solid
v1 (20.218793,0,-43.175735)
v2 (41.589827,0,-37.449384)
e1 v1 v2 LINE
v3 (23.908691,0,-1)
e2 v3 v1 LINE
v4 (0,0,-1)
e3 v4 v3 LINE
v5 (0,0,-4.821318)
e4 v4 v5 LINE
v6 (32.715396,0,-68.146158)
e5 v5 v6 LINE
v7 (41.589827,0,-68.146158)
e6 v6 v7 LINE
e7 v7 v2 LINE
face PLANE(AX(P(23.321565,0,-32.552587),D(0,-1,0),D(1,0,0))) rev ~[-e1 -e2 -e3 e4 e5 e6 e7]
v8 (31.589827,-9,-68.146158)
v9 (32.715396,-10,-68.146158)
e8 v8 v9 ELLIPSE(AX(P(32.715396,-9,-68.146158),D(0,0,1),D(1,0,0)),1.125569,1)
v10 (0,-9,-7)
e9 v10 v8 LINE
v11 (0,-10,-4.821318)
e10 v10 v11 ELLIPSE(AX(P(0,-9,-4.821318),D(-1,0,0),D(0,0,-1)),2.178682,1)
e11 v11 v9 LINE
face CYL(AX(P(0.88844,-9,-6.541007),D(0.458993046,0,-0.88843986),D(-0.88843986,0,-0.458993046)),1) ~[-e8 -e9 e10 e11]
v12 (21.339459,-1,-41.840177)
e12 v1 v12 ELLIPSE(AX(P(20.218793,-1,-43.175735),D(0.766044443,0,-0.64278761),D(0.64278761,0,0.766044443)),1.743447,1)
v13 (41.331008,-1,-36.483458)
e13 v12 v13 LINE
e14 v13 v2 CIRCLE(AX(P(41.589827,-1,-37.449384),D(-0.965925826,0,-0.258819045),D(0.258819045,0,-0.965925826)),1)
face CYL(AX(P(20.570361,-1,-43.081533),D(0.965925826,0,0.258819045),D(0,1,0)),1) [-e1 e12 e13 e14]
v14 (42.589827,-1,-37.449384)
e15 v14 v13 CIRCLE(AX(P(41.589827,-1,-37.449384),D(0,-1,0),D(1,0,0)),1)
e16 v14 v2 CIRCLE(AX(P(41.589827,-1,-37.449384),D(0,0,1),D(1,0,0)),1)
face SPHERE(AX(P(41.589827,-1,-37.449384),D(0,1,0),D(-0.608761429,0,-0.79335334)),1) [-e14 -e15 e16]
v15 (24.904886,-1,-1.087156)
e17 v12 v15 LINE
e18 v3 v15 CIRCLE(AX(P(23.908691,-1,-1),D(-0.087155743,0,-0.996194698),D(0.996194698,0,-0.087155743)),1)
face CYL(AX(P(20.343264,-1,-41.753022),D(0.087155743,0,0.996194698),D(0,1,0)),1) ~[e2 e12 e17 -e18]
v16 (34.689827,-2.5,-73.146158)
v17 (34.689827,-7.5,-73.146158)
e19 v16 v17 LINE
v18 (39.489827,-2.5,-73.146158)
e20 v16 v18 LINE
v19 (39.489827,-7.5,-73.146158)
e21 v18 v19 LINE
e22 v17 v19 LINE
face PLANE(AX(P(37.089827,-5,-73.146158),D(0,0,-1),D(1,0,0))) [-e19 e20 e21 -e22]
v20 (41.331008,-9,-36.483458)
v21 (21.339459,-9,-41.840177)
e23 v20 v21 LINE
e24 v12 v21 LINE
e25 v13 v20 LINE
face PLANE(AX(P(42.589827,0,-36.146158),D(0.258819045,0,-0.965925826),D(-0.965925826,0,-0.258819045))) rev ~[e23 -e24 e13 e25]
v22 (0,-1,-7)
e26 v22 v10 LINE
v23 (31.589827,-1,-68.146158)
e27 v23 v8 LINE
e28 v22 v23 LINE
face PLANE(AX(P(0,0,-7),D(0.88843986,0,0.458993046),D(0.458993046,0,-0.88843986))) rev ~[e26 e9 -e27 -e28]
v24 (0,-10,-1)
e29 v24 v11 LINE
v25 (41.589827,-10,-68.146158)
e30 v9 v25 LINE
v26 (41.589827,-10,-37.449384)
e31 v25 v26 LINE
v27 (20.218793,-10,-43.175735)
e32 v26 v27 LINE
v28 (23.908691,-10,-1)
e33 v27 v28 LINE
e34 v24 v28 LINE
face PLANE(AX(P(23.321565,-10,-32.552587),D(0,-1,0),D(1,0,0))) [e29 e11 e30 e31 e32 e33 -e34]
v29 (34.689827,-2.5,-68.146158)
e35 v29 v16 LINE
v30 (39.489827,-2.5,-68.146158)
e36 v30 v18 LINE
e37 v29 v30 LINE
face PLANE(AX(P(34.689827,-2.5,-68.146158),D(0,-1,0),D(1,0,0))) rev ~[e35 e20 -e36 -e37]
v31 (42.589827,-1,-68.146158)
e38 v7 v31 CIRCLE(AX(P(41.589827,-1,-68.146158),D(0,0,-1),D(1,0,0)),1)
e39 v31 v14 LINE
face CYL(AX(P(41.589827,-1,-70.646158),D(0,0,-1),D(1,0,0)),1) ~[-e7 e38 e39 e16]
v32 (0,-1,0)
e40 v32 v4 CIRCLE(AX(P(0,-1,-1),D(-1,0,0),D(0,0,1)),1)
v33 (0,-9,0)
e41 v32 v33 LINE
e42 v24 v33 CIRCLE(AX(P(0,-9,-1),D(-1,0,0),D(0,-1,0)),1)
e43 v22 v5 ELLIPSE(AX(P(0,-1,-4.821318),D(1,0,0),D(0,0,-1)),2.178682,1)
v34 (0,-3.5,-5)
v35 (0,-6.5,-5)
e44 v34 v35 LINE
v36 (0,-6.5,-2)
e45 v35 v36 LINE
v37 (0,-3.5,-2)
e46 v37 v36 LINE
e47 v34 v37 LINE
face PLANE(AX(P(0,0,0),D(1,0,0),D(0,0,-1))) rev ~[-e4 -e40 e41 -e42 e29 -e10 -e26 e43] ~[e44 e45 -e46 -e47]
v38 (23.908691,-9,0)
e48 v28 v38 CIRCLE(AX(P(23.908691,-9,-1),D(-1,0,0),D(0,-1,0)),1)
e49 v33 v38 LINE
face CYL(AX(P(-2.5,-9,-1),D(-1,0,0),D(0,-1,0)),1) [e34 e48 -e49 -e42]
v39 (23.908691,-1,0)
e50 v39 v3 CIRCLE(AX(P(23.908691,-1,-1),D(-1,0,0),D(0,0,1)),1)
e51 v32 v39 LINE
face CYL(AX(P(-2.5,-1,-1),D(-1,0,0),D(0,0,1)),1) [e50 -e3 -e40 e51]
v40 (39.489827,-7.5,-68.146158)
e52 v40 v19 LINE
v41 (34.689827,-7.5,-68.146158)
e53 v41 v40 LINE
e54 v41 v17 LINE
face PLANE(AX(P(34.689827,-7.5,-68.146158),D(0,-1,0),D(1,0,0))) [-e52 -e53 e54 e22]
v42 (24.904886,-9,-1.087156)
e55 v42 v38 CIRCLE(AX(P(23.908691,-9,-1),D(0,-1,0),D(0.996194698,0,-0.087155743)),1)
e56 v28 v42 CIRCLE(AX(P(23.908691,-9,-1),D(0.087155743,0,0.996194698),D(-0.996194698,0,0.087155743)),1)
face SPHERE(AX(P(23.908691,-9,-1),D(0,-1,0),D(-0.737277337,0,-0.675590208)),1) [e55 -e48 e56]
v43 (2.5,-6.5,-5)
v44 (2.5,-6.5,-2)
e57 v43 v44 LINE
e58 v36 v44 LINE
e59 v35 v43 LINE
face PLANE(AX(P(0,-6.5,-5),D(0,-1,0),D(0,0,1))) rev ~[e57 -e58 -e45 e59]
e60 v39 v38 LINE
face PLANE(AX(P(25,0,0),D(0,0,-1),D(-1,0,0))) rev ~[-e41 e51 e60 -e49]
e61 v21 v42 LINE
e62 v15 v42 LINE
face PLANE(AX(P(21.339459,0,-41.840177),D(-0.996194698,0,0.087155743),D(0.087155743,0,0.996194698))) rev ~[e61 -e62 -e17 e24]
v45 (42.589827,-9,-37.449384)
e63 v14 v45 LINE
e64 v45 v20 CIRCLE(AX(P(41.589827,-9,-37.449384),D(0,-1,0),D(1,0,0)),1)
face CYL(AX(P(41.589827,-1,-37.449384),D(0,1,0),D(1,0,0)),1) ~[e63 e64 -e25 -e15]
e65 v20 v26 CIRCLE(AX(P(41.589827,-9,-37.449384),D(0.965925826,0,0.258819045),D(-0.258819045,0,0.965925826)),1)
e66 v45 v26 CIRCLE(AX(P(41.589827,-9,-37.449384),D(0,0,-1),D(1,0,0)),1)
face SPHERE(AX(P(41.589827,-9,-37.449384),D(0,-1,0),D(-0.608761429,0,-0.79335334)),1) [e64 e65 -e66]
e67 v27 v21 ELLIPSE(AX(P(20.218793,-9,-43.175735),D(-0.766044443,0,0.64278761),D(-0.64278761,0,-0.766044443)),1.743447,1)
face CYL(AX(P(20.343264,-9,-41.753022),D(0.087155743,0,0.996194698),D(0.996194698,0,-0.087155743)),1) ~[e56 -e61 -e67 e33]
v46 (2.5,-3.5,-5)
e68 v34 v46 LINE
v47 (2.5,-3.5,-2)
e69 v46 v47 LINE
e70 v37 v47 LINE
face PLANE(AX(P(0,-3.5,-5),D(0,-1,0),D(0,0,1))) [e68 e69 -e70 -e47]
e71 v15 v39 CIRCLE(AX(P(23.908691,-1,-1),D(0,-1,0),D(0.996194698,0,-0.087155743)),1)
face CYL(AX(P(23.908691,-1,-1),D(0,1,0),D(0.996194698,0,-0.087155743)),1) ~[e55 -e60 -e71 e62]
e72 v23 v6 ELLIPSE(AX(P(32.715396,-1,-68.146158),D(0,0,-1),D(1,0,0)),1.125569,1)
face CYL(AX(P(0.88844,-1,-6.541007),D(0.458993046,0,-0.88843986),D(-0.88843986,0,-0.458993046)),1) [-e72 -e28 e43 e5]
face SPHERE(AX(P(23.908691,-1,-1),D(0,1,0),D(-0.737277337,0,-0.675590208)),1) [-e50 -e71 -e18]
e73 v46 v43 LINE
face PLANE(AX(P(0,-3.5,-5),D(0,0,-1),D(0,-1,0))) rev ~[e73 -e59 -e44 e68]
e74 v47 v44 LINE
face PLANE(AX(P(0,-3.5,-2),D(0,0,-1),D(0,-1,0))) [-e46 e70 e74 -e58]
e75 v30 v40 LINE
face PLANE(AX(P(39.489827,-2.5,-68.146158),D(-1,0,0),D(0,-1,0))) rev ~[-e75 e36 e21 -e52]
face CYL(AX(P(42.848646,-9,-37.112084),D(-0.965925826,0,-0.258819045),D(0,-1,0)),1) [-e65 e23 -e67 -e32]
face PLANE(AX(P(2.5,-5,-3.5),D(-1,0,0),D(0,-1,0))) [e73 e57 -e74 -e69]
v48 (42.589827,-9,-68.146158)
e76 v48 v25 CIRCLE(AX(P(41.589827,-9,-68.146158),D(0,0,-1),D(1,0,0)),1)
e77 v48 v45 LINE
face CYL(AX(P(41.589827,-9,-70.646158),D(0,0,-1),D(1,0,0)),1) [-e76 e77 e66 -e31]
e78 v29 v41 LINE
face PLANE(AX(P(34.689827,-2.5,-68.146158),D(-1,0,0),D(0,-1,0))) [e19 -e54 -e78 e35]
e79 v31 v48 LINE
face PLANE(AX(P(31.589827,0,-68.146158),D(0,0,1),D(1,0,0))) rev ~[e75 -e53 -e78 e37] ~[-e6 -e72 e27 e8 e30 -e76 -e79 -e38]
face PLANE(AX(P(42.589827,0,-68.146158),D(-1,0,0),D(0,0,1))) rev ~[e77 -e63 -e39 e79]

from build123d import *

# Parameters (mm, degrees)
F1_DEPTH      = 10
F3_W          = 4.8
F3_H          = 5
F4_DEPTH      = 5
F5_W          = 3
F5_H          = 3
F6_DEPTH      = 2.5
F7_R          = 1
F8_R          = 1
F9_R          = 1
F10_R         = 1
F11_R         = 1
F12_T1_DEPTH  = 33.1967746272
F12_T3_DEPTH  = 8
F12_T8_DEPTH  = 1
F12_T14_DEPTH = 1
F13_T1_DEPTH  = 26.4086914989
F13_T3_DEPTH  = 8
F13_T8_DEPTH  = 1
F13_T14_DEPTH = 1


# Not quite as in the source:
# - a fillet or chamfer that OpenCascade refuses, or shapes differently, is made with other operations: its cross-section is extruded or revolved along the edge and cut away or added


with BuildPart() as f1:
    # F0 (on Front) → F1 (new body)
    with BuildSketch(Plane.XZ):
        Polygon((25, 0), (0, 0), (0, -7), (31.589826983, -68.1461583276), (42.589826983, -68.1461583276), (42.589826983, -36.1461583276), (21.3394588046, -41.8401773199), align=None)
    extrude(amount=F1_DEPTH)

    # F3 (on face) → F4 (join)
    with BuildSketch(Plane(origin=(0, 0, -68.1461583276), x_dir=(1, 0, 0), z_dir=(0, 0, -1))):
        with Locations((37.089826983, 5)):
            Rectangle(F3_W, F3_H)
    extrude(amount=F4_DEPTH)

    # F5 (on face) → F6 (cut)
    with BuildSketch(Plane(origin=(0, 0, 0), x_dir=(0, -1, 0), z_dir=(-1, 0, 0))):
        with Locations((5, -3.5)):
            Rectangle(F5_W, F5_H)
    extrude(amount=-F6_DEPTH, mode=Mode.SUBTRACT)

    # F7
    f7_edges = [f1.edges().sort_by_distance(p)[0] for p in [
        (23.169729, -10, -20.920089),
    ]]
    fillet(f7_edges, radius=F7_R)

    # F8
    f8_edges = [f1.edges().sort_by_distance(p)[0] for p in [
        (23.169729, 0, -20.920089),
    ]]
    fillet(f8_edges, radius=F8_R)

    # F9
    f9_edges = [f1.edges().sort_by_distance(p)[0] for p in [
        (15.794913, 0, -37.573079),
        (15.794913, -10, -37.573079),
    ]]
    fillet(f9_edges, radius=F9_R)

    # F10
    f10_edges = [f1.edges().sort_by_distance(p)[0] for p in [
        (31.964643, 0, -38.993168),
    ]]
    fillet(f10_edges, radius=F10_R)

    # F11
    f11_edges = [f1.edges().sort_by_distance(p)[0] for p in [
        (31.964643, -10, -38.993168),
    ]]
    fillet(f11_edges, radius=F11_R)

    # F12: fillet of radius 1 on 1 edges, made by hand

    # F12_s2 → F12_t1 (cut)
    with BuildSketch(Plane.XY.offset(-70.6461583276)):
        with BuildLine():
            ThreePointArc((42.589826983, -1), (42.2969337641, -0.2928932188), (41.589826983, 0))
            Line((41.589826983, 0), (42.589826983, 0))
            Line((42.589826983, 0), (42.589826983, -1))
        make_face()
        with BuildLine():
            ThreePointArc((42.589826983, -9), (42.2969337641, -9.7071067812), (41.589826983, -10))
            Line((41.589826983, -10), (42.589826983, -10))
            Line((42.589826983, -10), (42.589826983, -9))
        make_face()
    extrude(amount=F12_T1_DEPTH, mode=Mode.SUBTRACT)

    # F12_s4 → F12_t3 (cut)
    with BuildSketch(Plane.XZ.offset(1)):
        with BuildLine():
            ThreePointArc((42.589826983, -37.4493837004), (42.198588412, -36.6560303601), (41.3310079379, -36.4834578742))
            Line((41.3310079379, -36.4834578742), (42.589826983, -36.1461583276))
            Line((42.589826983, -36.1461583276), (42.589826983, -37.4493837004))
        make_face()
    extrude(amount=F12_T3_DEPTH, mode=Mode.SUBTRACT)


with BuildPart() as f12_tool6:
    # F12_s7 → F12_t8 (new body)
    with BuildSketch(Plane.XZ.offset(1)):
        Polygon((41.589826983, -37.4493837004), (42.589826983, -37.4493837004), (42.589826983, -36.1461583276), (41.3310079379, -36.4834578742), align=None)
    extrude(amount=-F12_T8_DEPTH)

    # F12_s9 → F12_t10 (revolve, cut)
    with BuildSketch(Plane(origin=(41.589826983, -1, -37.4493837004), x_dir=(-0.608761429, 0, -0.7933533403), z_dir=(0.7933533403, 0, -0.608761429))):
        with BuildLine():
            ThreePointArc((0, -1), (1, 0), (0, 1))
            Line((0, 1), (0, -1))
        make_face()
    revolve(axis=Axis((41.589826983, -1, -37.4493837004), (0, 1, 0)), mode=Mode.SUBTRACT)


with BuildPart() as f1_1:
    add(f1.part)

    # F12_t5: cut F12_tool6
    add(f12_tool6.part, mode=Mode.SUBTRACT)


with BuildPart() as f12_tool12:
    # F12_s13 → F12_t14 (new body)
    with BuildSketch(Plane.XZ.offset(9)):
        Polygon((41.589826983, -37.4493837004), (42.589826983, -37.4493837004), (42.589826983, -36.1461583276), (41.3310079379, -36.4834578742), align=None)
    extrude(amount=F12_T14_DEPTH)

    # F12_s15 → F12_t16 (revolve, cut)
    with BuildSketch(Plane(origin=(41.589826983, -9, -37.4493837004), x_dir=(-0.608761429, 0, -0.7933533403), z_dir=(-0.7933533403, 0, 0.608761429))):
        with BuildLine():
            ThreePointArc((0, -1), (1, 0), (0, 1))
            Line((0, 1), (0, -1))
        make_face()
    revolve(axis=Axis((41.589826983, -9, -37.4493837004), (0, -1, 0)), mode=Mode.SUBTRACT)


with BuildPart() as f1_2:
    add(f1_1.part)

    # F12_t11: cut F12_tool12
    add(f12_tool12.part, mode=Mode.SUBTRACT)

    # F13: fillet of radius 1 on 3 edges, made by hand

    # F13_s2 → F13_t1 (cut)
    with BuildSketch(Plane.YZ.offset(-2.5)):
        with BuildLine():
            ThreePointArc((-10, -1), (-9.7071067812, -0.2928932188), (-9, 0))
            Line((-9, 0), (-10, 0))
            Line((-10, 0), (-10, -1))
        make_face()
        with BuildLine():
            ThreePointArc((-1, 0), (-0.2928932188, -0.2928932188), (0, -1))
            Line((0, -1), (0, 0))
            Line((0, 0), (-1, 0))
        make_face()
    extrude(amount=F13_T1_DEPTH, mode=Mode.SUBTRACT)

    # F13_s4 → F13_t3 (cut)
    with BuildSketch(Plane.XZ.offset(1)):
        with BuildLine():
            ThreePointArc((24.904886197, -1.0871557427), (24.6459688357, -0.3244097924), (23.9086914989, 0))
            Line((23.9086914989, 0), (25, 0))
            Line((25, 0), (24.904886197, -1.0871557427))
        make_face()
    extrude(amount=F13_T3_DEPTH, mode=Mode.SUBTRACT)


with BuildPart() as f13_tool6:
    # F13_s7 → F13_t8 (new body)
    with BuildSketch(Plane.XZ.offset(1)):
        Polygon((23.9086914989, -1), (24.904886197, -1.0871557427), (25, 0), (23.9086914989, 0), align=None)
    extrude(amount=-F13_T8_DEPTH)

    # F13_s9 → F13_t10 (revolve, cut)
    with BuildSketch(Plane(origin=(23.9086914989, -1, -1), x_dir=(-0.7372773368, 0, -0.6755902076), z_dir=(0.6755902076, 0, -0.7372773368))):
        with BuildLine():
            ThreePointArc((0, -1), (1, 0), (0, 1))
            Line((0, 1), (0, -1))
        make_face()
    revolve(axis=Axis((23.9086914989, -1, -1), (0, 1, 0)), mode=Mode.SUBTRACT)


with BuildPart() as f1_3:
    add(f1_2.part)

    # F13_t5: cut F13_tool6
    add(f13_tool6.part, mode=Mode.SUBTRACT)


with BuildPart() as f13_tool12:
    # F13_s13 → F13_t14 (new body)
    with BuildSketch(Plane.XZ.offset(9)):
        Polygon((23.9086914989, -1), (24.904886197, -1.0871557427), (25, 0), (23.9086914989, 0), align=None)
    extrude(amount=F13_T14_DEPTH)

    # F13_s15 → F13_t16 (revolve, cut)
    with BuildSketch(Plane(origin=(23.9086914989, -9, -1), x_dir=(-0.7372773368, 0, -0.6755902076), z_dir=(-0.6755902076, 0, 0.7372773368))):
        with BuildLine():
            ThreePointArc((0, -1), (1, 0), (0, 1))
            Line((0, 1), (0, -1))
        make_face()
    revolve(axis=Axis((23.9086914989, -9, -1), (0, -1, 0)), mode=Mode.SUBTRACT)


with BuildPart() as f1_4:
    add(f1_3.part)

    # F13_t11: cut F13_tool12
    add(f13_tool12.part, mode=Mode.SUBTRACT)


solid = f1_4.part
